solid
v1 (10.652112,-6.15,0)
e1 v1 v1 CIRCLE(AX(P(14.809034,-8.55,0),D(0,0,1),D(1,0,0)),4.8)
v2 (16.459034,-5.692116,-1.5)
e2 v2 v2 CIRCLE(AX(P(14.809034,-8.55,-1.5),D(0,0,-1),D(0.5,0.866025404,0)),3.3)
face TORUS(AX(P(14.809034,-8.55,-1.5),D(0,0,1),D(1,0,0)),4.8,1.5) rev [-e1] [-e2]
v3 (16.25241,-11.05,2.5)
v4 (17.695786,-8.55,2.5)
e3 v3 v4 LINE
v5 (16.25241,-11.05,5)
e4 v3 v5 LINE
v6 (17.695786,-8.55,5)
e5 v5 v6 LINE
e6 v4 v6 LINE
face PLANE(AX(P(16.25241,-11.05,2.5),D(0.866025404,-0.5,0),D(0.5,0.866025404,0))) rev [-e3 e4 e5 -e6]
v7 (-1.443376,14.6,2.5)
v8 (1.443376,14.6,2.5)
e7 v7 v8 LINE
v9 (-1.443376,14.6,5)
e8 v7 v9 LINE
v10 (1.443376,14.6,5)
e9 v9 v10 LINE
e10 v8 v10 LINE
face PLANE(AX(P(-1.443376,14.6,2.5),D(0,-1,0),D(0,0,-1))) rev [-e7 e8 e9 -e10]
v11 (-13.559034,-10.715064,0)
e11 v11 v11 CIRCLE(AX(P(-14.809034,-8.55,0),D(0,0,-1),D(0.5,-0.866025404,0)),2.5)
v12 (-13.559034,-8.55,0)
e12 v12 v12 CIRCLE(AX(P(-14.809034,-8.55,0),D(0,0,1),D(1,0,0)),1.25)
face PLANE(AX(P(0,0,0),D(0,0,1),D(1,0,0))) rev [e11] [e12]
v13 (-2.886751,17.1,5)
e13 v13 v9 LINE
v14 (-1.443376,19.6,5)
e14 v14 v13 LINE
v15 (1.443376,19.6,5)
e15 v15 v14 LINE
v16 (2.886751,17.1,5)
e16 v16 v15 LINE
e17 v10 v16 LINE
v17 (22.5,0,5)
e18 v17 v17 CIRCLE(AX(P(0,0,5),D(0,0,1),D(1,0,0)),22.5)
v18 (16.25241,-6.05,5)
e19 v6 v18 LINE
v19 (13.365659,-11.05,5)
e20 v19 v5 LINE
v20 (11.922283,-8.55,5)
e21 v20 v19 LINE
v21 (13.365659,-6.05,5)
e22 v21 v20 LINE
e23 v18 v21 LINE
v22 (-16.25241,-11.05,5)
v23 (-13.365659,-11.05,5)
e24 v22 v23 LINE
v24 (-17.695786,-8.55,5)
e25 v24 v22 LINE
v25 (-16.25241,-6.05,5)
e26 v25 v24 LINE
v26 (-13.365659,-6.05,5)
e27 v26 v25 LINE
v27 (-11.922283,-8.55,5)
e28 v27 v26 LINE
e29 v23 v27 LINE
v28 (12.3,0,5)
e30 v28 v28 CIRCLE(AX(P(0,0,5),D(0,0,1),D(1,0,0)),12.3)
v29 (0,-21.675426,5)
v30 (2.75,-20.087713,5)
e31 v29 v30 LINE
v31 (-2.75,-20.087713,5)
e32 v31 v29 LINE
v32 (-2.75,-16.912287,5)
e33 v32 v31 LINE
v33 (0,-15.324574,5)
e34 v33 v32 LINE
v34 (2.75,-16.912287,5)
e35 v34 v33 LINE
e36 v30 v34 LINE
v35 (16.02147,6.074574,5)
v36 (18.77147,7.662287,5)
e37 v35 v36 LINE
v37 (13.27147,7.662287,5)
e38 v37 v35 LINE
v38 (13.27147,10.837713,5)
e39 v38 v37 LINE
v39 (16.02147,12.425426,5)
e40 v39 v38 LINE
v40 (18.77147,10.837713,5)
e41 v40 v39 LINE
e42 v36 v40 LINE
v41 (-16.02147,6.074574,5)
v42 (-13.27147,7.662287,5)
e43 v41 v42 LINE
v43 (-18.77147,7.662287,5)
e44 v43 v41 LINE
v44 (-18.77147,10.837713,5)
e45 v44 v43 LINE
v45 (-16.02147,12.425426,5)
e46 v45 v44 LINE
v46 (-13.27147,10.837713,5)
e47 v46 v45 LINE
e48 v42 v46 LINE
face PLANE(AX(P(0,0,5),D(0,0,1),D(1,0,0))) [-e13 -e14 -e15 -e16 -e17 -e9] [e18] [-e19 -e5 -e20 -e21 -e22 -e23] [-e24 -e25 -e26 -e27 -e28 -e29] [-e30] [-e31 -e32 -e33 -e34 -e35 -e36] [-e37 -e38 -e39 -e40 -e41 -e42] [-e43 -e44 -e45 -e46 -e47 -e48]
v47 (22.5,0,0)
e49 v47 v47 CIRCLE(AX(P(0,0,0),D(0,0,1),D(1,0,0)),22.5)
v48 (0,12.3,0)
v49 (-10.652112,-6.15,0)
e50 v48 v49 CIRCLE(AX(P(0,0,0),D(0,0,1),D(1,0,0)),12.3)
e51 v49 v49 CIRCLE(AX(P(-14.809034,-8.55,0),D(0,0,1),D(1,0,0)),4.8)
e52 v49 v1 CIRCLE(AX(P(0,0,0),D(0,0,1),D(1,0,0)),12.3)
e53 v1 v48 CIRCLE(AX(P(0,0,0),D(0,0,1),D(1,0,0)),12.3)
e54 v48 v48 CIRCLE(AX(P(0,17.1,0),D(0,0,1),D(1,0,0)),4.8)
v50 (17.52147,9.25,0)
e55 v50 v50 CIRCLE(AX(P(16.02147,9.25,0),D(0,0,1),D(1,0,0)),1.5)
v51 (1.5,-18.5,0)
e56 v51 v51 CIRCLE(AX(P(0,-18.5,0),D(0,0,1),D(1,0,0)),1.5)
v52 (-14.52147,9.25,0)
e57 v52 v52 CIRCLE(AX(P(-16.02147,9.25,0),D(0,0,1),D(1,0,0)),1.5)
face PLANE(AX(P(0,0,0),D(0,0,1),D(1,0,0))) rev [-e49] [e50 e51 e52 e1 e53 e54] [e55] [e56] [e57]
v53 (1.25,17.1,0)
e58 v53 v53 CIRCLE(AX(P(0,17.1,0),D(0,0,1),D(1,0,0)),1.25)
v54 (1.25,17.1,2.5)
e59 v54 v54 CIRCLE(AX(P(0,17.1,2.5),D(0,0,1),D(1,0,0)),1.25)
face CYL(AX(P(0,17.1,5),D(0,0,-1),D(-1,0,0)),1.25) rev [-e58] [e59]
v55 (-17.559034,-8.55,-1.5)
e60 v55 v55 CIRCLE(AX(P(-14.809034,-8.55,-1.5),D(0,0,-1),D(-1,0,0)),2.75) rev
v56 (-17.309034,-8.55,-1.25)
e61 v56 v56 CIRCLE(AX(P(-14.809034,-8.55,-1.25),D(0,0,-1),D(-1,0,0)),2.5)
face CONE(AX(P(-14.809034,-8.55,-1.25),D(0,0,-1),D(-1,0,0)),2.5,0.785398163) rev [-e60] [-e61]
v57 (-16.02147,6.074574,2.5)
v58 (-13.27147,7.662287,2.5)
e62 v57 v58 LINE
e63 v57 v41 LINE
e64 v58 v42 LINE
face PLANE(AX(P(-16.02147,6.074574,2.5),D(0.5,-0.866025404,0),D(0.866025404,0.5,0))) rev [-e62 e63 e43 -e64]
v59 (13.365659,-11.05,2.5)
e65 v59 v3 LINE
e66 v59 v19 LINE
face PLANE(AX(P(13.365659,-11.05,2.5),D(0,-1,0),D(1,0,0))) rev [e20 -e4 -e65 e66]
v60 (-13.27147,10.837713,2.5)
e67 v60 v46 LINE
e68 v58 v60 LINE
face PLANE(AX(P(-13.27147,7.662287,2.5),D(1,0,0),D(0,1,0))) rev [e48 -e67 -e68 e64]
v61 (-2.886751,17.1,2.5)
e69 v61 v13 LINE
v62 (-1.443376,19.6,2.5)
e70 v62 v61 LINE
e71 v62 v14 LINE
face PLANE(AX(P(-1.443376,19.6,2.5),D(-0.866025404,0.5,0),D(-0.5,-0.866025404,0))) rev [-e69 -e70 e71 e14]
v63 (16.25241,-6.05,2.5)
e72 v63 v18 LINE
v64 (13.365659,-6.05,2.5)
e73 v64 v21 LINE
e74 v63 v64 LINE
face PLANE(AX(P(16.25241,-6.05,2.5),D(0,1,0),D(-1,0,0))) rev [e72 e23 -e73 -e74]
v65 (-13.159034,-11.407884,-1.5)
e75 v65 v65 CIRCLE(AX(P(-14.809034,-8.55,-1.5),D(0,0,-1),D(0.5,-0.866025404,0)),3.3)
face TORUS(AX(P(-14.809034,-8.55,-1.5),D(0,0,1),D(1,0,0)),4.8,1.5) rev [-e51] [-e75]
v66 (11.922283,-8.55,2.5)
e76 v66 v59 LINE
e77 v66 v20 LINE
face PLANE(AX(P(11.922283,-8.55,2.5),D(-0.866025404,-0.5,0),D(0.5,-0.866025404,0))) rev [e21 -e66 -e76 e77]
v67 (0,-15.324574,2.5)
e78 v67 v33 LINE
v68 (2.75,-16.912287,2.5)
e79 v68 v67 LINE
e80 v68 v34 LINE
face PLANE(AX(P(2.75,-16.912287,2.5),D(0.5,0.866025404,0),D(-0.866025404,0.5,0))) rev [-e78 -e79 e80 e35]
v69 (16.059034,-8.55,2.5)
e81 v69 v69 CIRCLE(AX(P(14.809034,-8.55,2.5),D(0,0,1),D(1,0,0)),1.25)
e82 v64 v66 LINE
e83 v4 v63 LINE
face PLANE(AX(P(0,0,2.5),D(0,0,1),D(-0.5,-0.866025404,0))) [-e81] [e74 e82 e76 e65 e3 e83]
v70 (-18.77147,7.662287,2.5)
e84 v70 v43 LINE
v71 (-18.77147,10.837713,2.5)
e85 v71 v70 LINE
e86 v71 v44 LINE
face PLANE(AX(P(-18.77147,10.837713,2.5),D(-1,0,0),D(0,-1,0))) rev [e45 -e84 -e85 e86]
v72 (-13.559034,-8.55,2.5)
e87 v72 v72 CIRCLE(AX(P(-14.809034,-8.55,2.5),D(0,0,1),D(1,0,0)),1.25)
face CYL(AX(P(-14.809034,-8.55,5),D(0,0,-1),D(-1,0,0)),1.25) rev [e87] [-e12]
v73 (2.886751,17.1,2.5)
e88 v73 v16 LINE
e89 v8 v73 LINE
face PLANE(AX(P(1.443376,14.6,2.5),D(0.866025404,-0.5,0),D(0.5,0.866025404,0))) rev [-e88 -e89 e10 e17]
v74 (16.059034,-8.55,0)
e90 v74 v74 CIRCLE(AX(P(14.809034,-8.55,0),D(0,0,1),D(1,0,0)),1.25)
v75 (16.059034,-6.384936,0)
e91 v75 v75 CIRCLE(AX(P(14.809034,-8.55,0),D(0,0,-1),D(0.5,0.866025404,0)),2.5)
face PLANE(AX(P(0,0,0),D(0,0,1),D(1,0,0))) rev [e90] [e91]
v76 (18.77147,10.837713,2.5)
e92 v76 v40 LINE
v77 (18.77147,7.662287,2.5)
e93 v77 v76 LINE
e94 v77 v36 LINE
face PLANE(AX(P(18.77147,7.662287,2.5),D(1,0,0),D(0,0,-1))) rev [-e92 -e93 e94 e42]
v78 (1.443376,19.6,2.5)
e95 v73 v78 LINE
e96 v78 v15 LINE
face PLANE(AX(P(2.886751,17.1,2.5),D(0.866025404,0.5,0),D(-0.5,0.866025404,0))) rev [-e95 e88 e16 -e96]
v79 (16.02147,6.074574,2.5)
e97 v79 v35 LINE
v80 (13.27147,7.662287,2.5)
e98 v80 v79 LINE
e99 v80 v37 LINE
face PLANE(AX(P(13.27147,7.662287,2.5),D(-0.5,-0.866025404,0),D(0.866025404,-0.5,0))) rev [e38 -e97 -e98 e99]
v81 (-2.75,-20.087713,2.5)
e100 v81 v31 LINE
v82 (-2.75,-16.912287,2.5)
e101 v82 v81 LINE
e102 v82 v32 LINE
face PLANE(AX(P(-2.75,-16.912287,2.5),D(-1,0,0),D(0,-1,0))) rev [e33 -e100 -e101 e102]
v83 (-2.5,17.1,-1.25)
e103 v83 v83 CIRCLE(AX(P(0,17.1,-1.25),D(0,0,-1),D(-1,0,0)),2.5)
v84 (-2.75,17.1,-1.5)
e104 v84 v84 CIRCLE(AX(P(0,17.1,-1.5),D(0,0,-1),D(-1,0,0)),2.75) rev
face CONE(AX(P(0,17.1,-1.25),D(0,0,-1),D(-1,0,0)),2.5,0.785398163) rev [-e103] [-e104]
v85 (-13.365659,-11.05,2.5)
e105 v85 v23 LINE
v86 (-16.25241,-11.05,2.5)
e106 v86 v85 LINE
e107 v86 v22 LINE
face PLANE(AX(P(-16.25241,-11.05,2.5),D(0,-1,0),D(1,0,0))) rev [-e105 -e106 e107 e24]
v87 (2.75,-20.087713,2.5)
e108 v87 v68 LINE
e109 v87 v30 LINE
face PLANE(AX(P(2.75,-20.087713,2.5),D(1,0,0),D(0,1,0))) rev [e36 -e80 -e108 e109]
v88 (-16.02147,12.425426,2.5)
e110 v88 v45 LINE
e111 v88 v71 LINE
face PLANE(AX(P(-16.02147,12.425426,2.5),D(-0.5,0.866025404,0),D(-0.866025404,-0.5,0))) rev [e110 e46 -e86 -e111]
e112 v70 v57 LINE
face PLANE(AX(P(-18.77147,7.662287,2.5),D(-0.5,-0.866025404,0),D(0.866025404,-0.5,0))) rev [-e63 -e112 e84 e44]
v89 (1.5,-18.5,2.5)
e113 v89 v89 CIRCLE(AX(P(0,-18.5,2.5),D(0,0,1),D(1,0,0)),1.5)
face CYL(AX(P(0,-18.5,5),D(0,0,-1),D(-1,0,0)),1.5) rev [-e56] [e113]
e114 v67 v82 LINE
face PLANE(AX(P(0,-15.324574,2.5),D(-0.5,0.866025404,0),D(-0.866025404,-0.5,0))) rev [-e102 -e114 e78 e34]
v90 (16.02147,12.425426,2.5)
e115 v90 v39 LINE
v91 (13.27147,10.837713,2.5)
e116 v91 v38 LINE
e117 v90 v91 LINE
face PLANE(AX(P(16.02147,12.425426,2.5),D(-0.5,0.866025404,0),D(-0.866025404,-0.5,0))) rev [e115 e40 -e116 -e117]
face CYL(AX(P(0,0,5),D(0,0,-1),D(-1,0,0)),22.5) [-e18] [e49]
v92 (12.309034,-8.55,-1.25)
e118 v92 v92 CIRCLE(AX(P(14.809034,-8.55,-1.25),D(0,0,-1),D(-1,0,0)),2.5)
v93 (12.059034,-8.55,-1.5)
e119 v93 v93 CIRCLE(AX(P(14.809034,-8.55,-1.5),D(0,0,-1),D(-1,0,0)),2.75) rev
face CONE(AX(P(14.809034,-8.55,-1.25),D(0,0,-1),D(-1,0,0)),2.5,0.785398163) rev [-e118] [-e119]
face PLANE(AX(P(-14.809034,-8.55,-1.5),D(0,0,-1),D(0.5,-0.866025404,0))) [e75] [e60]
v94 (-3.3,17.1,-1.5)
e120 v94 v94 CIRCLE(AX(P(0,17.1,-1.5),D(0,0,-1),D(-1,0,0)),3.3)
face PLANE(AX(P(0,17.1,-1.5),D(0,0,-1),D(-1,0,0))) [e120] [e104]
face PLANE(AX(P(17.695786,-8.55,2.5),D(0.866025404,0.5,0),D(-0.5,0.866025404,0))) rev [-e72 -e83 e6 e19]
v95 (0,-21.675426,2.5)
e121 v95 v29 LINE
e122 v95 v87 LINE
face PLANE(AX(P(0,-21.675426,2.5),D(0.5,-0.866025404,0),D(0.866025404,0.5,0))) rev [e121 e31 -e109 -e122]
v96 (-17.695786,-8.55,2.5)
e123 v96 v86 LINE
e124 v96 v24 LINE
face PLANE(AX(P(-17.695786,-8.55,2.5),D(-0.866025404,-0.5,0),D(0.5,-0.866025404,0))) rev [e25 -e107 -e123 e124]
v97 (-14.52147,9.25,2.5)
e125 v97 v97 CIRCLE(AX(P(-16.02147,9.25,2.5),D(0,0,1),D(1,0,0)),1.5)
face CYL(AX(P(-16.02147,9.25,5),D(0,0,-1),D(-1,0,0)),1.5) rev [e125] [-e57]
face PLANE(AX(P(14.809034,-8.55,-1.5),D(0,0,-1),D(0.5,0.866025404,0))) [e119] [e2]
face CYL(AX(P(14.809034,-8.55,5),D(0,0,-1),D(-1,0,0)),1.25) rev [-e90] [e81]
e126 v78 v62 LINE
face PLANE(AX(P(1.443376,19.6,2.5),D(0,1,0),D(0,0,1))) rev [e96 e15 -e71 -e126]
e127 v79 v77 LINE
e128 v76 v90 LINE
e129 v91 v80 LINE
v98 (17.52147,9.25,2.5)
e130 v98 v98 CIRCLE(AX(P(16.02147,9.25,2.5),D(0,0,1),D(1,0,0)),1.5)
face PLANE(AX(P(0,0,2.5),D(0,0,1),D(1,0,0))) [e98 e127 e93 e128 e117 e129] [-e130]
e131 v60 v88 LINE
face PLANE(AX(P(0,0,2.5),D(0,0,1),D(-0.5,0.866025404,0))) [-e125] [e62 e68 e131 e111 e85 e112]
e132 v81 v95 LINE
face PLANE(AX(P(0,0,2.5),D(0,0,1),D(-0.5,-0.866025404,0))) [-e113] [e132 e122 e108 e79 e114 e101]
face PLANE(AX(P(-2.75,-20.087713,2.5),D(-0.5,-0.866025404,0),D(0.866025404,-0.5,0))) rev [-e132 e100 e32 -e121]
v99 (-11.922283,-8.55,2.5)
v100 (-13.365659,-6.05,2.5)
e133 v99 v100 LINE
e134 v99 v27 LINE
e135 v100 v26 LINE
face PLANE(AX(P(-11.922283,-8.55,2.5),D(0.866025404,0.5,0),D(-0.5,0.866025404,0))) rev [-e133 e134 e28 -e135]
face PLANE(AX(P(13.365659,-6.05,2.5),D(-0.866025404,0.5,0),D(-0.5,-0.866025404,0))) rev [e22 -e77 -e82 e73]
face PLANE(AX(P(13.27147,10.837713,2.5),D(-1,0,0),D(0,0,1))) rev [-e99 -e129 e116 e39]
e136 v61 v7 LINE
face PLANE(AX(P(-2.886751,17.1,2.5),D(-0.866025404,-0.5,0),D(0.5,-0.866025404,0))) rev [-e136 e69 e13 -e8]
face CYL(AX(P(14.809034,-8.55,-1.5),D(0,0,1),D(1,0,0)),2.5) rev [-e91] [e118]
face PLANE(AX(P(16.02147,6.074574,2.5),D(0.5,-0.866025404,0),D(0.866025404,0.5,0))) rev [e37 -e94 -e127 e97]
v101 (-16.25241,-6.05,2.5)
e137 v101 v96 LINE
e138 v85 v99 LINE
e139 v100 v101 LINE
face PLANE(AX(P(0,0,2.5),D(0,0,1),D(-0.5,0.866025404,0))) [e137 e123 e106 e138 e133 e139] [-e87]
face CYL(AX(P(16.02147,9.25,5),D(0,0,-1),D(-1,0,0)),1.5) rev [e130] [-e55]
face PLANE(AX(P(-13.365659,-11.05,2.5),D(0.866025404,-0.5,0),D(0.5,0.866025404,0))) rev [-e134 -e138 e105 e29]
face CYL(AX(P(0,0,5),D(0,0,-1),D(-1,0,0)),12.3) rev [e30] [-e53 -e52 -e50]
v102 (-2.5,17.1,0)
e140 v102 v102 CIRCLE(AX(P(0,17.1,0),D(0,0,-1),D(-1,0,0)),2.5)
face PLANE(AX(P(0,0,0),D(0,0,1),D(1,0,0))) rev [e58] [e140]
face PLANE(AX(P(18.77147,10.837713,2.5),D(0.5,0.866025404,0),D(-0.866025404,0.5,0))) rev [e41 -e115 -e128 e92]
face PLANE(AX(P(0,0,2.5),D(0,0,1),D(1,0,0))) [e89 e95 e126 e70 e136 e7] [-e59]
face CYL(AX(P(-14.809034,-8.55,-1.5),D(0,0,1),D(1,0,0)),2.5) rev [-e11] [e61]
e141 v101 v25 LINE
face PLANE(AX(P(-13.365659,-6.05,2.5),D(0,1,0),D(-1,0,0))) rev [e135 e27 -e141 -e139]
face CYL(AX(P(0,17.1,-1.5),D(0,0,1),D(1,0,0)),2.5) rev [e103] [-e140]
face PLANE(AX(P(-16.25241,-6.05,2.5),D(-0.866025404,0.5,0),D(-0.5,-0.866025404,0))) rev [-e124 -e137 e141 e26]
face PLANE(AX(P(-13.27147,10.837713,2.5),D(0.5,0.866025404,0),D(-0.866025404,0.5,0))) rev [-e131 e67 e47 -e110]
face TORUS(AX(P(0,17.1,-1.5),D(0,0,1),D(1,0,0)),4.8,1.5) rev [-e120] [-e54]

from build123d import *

# Parameters (mm, degrees)
SKETCH2_R                    = 22.5
SKETCH2_R_2                  = 12.3
SKETCH2_R_3                  = 1.25
SKETCH2_R_4                  = 1.5
BOSS_EXTRUDE1_DEPTH          = 5
CUT_EXTRUDE1_DEPTH           = 2.5
CIRPATTERN1_COUNT            = 3
SKETCH4_R                    = 3.3
SKETCH4_R_2                  = 2.5
BOSS_EXTRUDE2_DEPTH          = 1.5
FILLET1_R                    = 1.5
CHAMFER1_SIZE                = 0.25
CIRPATTERN2_COUNT            = 3
FILLET1_OF_CIRPATTERN2_R     = 1.5
CHAMFER1_OF_CIRPATTERN2_SIZE = 0.25


with BuildPart() as part:
    # Sketch2 → Boss-Extrude1 (new body)
    with BuildSketch(Plane.XY):
        Circle(SKETCH2_R)
        Circle(SKETCH2_R_2, mode=Mode.SUBTRACT)
        with Locations((0, 17.1)):
            Circle(SKETCH2_R_3, mode=Mode.SUBTRACT)
        with Locations((14.809034405, -8.55)):
            Circle(SKETCH2_R_3, mode=Mode.SUBTRACT)
        with Locations((16.02146997, 9.25)):
            Circle(SKETCH2_R_4, mode=Mode.SUBTRACT)
        with Locations((0, -18.5)):
            Circle(SKETCH2_R_4, mode=Mode.SUBTRACT)
        with Locations((-14.809034405, -8.55)):
            Circle(SKETCH2_R_3, mode=Mode.SUBTRACT)
        with Locations((-16.02146997, 9.25)):
            Circle(SKETCH2_R_4, mode=Mode.SUBTRACT)
    extrude(amount=BOSS_EXTRUDE1_DEPTH)

    # Sketch3 → Cut-Extrude1 (cut)
    with BuildSketch(Plane.XY.offset(5)):
        Polygon((-2.886751346, 17.1), (-1.443375673, 14.6), (1.443375673, 14.6), (2.886751346, 17.1), (1.443375673, 19.6), (-1.443375673, 19.6), align=None)
        Polygon((16.02146997, 6.074573519), (18.77146997, 7.66228676), (18.77146997, 10.83771324), (16.02146997, 12.425426481), (13.27146997, 10.83771324), (13.27146997, 7.66228676), align=None)
    cut_extrude1 = extrude(amount=-CUT_EXTRUDE1_DEPTH, mode=Mode.SUBTRACT)

    # CirPattern1: Cut-Extrude1 ×3 about axis
    cirpattern1_axis = Axis((0, 0, 0), (0, 0, 1))
    for i in range(1, CIRPATTERN1_COUNT):
        add(cut_extrude1.rotate(cirpattern1_axis, i * 360 / CIRPATTERN1_COUNT), mode=Mode.SUBTRACT)

    # Sketch4 → Boss-Extrude2 (add)
    with BuildSketch(Plane(origin=(0, 0, 0), x_dir=(-1, 0, 0), z_dir=(0, 0, -1))):
        with Locations(Location((0, 17.1, 0), (0, 0, 180))):
            Circle(SKETCH4_R)
        with Locations((0, 17.1)):
            Circle(SKETCH4_R_2, mode=Mode.SUBTRACT)
    boss_extrude2 = extrude(amount=BOSS_EXTRUDE2_DEPTH)

    # Fillet1
    fillet1_edges = [part.edges().sort_by_distance(p)[0] for p in [
        (-3.3, 17.1, 0),
    ]]
    fillet(fillet1_edges, radius=FILLET1_R - 0.0001)  # a hair under: the kernel refuses the full size

    # Chamfer1
    chamfer1_edges = [part.edges().sort_by_distance(p)[0] for p in [
        (2.5, 17.1, -1.5),
    ]]
    chamfer(chamfer1_edges, length=CHAMFER1_SIZE)

    # CirPattern2: Boss-Extrude2 ×3 about axis
    cirpattern2_axis = Axis((0, 0, 0), (0, 0, 1))
    for i in range(1, CIRPATTERN2_COUNT):
        add(boss_extrude2.rotate(cirpattern2_axis, i * 360 / CIRPATTERN2_COUNT))

    # Fillet1 of CirPattern2
    fillet1_of_cirpattern2_edges = [part.edges().sort_by_distance(p)[0] for p in [
        (-13.159034405, -11.407883832, 0),
        (16.459034405, -5.692116168, 0),
    ]]
    fillet(fillet1_of_cirpattern2_edges, radius=FILLET1_OF_CIRPATTERN2_R - 0.0001)  # a hair under: the kernel refuses the full size

    # Chamfer1 of CirPattern2
    chamfer1_of_cirpattern2_edges = [part.edges().sort_by_distance(p)[0] for p in [
        (-16.059034405, -6.384936491, -1.5),
        (13.559034405, -10.715063509, -1.5),
    ]]
    chamfer(chamfer1_of_cirpattern2_edges, length=CHAMFER1_OF_CIRPATTERN2_SIZE)


solid = part.part
